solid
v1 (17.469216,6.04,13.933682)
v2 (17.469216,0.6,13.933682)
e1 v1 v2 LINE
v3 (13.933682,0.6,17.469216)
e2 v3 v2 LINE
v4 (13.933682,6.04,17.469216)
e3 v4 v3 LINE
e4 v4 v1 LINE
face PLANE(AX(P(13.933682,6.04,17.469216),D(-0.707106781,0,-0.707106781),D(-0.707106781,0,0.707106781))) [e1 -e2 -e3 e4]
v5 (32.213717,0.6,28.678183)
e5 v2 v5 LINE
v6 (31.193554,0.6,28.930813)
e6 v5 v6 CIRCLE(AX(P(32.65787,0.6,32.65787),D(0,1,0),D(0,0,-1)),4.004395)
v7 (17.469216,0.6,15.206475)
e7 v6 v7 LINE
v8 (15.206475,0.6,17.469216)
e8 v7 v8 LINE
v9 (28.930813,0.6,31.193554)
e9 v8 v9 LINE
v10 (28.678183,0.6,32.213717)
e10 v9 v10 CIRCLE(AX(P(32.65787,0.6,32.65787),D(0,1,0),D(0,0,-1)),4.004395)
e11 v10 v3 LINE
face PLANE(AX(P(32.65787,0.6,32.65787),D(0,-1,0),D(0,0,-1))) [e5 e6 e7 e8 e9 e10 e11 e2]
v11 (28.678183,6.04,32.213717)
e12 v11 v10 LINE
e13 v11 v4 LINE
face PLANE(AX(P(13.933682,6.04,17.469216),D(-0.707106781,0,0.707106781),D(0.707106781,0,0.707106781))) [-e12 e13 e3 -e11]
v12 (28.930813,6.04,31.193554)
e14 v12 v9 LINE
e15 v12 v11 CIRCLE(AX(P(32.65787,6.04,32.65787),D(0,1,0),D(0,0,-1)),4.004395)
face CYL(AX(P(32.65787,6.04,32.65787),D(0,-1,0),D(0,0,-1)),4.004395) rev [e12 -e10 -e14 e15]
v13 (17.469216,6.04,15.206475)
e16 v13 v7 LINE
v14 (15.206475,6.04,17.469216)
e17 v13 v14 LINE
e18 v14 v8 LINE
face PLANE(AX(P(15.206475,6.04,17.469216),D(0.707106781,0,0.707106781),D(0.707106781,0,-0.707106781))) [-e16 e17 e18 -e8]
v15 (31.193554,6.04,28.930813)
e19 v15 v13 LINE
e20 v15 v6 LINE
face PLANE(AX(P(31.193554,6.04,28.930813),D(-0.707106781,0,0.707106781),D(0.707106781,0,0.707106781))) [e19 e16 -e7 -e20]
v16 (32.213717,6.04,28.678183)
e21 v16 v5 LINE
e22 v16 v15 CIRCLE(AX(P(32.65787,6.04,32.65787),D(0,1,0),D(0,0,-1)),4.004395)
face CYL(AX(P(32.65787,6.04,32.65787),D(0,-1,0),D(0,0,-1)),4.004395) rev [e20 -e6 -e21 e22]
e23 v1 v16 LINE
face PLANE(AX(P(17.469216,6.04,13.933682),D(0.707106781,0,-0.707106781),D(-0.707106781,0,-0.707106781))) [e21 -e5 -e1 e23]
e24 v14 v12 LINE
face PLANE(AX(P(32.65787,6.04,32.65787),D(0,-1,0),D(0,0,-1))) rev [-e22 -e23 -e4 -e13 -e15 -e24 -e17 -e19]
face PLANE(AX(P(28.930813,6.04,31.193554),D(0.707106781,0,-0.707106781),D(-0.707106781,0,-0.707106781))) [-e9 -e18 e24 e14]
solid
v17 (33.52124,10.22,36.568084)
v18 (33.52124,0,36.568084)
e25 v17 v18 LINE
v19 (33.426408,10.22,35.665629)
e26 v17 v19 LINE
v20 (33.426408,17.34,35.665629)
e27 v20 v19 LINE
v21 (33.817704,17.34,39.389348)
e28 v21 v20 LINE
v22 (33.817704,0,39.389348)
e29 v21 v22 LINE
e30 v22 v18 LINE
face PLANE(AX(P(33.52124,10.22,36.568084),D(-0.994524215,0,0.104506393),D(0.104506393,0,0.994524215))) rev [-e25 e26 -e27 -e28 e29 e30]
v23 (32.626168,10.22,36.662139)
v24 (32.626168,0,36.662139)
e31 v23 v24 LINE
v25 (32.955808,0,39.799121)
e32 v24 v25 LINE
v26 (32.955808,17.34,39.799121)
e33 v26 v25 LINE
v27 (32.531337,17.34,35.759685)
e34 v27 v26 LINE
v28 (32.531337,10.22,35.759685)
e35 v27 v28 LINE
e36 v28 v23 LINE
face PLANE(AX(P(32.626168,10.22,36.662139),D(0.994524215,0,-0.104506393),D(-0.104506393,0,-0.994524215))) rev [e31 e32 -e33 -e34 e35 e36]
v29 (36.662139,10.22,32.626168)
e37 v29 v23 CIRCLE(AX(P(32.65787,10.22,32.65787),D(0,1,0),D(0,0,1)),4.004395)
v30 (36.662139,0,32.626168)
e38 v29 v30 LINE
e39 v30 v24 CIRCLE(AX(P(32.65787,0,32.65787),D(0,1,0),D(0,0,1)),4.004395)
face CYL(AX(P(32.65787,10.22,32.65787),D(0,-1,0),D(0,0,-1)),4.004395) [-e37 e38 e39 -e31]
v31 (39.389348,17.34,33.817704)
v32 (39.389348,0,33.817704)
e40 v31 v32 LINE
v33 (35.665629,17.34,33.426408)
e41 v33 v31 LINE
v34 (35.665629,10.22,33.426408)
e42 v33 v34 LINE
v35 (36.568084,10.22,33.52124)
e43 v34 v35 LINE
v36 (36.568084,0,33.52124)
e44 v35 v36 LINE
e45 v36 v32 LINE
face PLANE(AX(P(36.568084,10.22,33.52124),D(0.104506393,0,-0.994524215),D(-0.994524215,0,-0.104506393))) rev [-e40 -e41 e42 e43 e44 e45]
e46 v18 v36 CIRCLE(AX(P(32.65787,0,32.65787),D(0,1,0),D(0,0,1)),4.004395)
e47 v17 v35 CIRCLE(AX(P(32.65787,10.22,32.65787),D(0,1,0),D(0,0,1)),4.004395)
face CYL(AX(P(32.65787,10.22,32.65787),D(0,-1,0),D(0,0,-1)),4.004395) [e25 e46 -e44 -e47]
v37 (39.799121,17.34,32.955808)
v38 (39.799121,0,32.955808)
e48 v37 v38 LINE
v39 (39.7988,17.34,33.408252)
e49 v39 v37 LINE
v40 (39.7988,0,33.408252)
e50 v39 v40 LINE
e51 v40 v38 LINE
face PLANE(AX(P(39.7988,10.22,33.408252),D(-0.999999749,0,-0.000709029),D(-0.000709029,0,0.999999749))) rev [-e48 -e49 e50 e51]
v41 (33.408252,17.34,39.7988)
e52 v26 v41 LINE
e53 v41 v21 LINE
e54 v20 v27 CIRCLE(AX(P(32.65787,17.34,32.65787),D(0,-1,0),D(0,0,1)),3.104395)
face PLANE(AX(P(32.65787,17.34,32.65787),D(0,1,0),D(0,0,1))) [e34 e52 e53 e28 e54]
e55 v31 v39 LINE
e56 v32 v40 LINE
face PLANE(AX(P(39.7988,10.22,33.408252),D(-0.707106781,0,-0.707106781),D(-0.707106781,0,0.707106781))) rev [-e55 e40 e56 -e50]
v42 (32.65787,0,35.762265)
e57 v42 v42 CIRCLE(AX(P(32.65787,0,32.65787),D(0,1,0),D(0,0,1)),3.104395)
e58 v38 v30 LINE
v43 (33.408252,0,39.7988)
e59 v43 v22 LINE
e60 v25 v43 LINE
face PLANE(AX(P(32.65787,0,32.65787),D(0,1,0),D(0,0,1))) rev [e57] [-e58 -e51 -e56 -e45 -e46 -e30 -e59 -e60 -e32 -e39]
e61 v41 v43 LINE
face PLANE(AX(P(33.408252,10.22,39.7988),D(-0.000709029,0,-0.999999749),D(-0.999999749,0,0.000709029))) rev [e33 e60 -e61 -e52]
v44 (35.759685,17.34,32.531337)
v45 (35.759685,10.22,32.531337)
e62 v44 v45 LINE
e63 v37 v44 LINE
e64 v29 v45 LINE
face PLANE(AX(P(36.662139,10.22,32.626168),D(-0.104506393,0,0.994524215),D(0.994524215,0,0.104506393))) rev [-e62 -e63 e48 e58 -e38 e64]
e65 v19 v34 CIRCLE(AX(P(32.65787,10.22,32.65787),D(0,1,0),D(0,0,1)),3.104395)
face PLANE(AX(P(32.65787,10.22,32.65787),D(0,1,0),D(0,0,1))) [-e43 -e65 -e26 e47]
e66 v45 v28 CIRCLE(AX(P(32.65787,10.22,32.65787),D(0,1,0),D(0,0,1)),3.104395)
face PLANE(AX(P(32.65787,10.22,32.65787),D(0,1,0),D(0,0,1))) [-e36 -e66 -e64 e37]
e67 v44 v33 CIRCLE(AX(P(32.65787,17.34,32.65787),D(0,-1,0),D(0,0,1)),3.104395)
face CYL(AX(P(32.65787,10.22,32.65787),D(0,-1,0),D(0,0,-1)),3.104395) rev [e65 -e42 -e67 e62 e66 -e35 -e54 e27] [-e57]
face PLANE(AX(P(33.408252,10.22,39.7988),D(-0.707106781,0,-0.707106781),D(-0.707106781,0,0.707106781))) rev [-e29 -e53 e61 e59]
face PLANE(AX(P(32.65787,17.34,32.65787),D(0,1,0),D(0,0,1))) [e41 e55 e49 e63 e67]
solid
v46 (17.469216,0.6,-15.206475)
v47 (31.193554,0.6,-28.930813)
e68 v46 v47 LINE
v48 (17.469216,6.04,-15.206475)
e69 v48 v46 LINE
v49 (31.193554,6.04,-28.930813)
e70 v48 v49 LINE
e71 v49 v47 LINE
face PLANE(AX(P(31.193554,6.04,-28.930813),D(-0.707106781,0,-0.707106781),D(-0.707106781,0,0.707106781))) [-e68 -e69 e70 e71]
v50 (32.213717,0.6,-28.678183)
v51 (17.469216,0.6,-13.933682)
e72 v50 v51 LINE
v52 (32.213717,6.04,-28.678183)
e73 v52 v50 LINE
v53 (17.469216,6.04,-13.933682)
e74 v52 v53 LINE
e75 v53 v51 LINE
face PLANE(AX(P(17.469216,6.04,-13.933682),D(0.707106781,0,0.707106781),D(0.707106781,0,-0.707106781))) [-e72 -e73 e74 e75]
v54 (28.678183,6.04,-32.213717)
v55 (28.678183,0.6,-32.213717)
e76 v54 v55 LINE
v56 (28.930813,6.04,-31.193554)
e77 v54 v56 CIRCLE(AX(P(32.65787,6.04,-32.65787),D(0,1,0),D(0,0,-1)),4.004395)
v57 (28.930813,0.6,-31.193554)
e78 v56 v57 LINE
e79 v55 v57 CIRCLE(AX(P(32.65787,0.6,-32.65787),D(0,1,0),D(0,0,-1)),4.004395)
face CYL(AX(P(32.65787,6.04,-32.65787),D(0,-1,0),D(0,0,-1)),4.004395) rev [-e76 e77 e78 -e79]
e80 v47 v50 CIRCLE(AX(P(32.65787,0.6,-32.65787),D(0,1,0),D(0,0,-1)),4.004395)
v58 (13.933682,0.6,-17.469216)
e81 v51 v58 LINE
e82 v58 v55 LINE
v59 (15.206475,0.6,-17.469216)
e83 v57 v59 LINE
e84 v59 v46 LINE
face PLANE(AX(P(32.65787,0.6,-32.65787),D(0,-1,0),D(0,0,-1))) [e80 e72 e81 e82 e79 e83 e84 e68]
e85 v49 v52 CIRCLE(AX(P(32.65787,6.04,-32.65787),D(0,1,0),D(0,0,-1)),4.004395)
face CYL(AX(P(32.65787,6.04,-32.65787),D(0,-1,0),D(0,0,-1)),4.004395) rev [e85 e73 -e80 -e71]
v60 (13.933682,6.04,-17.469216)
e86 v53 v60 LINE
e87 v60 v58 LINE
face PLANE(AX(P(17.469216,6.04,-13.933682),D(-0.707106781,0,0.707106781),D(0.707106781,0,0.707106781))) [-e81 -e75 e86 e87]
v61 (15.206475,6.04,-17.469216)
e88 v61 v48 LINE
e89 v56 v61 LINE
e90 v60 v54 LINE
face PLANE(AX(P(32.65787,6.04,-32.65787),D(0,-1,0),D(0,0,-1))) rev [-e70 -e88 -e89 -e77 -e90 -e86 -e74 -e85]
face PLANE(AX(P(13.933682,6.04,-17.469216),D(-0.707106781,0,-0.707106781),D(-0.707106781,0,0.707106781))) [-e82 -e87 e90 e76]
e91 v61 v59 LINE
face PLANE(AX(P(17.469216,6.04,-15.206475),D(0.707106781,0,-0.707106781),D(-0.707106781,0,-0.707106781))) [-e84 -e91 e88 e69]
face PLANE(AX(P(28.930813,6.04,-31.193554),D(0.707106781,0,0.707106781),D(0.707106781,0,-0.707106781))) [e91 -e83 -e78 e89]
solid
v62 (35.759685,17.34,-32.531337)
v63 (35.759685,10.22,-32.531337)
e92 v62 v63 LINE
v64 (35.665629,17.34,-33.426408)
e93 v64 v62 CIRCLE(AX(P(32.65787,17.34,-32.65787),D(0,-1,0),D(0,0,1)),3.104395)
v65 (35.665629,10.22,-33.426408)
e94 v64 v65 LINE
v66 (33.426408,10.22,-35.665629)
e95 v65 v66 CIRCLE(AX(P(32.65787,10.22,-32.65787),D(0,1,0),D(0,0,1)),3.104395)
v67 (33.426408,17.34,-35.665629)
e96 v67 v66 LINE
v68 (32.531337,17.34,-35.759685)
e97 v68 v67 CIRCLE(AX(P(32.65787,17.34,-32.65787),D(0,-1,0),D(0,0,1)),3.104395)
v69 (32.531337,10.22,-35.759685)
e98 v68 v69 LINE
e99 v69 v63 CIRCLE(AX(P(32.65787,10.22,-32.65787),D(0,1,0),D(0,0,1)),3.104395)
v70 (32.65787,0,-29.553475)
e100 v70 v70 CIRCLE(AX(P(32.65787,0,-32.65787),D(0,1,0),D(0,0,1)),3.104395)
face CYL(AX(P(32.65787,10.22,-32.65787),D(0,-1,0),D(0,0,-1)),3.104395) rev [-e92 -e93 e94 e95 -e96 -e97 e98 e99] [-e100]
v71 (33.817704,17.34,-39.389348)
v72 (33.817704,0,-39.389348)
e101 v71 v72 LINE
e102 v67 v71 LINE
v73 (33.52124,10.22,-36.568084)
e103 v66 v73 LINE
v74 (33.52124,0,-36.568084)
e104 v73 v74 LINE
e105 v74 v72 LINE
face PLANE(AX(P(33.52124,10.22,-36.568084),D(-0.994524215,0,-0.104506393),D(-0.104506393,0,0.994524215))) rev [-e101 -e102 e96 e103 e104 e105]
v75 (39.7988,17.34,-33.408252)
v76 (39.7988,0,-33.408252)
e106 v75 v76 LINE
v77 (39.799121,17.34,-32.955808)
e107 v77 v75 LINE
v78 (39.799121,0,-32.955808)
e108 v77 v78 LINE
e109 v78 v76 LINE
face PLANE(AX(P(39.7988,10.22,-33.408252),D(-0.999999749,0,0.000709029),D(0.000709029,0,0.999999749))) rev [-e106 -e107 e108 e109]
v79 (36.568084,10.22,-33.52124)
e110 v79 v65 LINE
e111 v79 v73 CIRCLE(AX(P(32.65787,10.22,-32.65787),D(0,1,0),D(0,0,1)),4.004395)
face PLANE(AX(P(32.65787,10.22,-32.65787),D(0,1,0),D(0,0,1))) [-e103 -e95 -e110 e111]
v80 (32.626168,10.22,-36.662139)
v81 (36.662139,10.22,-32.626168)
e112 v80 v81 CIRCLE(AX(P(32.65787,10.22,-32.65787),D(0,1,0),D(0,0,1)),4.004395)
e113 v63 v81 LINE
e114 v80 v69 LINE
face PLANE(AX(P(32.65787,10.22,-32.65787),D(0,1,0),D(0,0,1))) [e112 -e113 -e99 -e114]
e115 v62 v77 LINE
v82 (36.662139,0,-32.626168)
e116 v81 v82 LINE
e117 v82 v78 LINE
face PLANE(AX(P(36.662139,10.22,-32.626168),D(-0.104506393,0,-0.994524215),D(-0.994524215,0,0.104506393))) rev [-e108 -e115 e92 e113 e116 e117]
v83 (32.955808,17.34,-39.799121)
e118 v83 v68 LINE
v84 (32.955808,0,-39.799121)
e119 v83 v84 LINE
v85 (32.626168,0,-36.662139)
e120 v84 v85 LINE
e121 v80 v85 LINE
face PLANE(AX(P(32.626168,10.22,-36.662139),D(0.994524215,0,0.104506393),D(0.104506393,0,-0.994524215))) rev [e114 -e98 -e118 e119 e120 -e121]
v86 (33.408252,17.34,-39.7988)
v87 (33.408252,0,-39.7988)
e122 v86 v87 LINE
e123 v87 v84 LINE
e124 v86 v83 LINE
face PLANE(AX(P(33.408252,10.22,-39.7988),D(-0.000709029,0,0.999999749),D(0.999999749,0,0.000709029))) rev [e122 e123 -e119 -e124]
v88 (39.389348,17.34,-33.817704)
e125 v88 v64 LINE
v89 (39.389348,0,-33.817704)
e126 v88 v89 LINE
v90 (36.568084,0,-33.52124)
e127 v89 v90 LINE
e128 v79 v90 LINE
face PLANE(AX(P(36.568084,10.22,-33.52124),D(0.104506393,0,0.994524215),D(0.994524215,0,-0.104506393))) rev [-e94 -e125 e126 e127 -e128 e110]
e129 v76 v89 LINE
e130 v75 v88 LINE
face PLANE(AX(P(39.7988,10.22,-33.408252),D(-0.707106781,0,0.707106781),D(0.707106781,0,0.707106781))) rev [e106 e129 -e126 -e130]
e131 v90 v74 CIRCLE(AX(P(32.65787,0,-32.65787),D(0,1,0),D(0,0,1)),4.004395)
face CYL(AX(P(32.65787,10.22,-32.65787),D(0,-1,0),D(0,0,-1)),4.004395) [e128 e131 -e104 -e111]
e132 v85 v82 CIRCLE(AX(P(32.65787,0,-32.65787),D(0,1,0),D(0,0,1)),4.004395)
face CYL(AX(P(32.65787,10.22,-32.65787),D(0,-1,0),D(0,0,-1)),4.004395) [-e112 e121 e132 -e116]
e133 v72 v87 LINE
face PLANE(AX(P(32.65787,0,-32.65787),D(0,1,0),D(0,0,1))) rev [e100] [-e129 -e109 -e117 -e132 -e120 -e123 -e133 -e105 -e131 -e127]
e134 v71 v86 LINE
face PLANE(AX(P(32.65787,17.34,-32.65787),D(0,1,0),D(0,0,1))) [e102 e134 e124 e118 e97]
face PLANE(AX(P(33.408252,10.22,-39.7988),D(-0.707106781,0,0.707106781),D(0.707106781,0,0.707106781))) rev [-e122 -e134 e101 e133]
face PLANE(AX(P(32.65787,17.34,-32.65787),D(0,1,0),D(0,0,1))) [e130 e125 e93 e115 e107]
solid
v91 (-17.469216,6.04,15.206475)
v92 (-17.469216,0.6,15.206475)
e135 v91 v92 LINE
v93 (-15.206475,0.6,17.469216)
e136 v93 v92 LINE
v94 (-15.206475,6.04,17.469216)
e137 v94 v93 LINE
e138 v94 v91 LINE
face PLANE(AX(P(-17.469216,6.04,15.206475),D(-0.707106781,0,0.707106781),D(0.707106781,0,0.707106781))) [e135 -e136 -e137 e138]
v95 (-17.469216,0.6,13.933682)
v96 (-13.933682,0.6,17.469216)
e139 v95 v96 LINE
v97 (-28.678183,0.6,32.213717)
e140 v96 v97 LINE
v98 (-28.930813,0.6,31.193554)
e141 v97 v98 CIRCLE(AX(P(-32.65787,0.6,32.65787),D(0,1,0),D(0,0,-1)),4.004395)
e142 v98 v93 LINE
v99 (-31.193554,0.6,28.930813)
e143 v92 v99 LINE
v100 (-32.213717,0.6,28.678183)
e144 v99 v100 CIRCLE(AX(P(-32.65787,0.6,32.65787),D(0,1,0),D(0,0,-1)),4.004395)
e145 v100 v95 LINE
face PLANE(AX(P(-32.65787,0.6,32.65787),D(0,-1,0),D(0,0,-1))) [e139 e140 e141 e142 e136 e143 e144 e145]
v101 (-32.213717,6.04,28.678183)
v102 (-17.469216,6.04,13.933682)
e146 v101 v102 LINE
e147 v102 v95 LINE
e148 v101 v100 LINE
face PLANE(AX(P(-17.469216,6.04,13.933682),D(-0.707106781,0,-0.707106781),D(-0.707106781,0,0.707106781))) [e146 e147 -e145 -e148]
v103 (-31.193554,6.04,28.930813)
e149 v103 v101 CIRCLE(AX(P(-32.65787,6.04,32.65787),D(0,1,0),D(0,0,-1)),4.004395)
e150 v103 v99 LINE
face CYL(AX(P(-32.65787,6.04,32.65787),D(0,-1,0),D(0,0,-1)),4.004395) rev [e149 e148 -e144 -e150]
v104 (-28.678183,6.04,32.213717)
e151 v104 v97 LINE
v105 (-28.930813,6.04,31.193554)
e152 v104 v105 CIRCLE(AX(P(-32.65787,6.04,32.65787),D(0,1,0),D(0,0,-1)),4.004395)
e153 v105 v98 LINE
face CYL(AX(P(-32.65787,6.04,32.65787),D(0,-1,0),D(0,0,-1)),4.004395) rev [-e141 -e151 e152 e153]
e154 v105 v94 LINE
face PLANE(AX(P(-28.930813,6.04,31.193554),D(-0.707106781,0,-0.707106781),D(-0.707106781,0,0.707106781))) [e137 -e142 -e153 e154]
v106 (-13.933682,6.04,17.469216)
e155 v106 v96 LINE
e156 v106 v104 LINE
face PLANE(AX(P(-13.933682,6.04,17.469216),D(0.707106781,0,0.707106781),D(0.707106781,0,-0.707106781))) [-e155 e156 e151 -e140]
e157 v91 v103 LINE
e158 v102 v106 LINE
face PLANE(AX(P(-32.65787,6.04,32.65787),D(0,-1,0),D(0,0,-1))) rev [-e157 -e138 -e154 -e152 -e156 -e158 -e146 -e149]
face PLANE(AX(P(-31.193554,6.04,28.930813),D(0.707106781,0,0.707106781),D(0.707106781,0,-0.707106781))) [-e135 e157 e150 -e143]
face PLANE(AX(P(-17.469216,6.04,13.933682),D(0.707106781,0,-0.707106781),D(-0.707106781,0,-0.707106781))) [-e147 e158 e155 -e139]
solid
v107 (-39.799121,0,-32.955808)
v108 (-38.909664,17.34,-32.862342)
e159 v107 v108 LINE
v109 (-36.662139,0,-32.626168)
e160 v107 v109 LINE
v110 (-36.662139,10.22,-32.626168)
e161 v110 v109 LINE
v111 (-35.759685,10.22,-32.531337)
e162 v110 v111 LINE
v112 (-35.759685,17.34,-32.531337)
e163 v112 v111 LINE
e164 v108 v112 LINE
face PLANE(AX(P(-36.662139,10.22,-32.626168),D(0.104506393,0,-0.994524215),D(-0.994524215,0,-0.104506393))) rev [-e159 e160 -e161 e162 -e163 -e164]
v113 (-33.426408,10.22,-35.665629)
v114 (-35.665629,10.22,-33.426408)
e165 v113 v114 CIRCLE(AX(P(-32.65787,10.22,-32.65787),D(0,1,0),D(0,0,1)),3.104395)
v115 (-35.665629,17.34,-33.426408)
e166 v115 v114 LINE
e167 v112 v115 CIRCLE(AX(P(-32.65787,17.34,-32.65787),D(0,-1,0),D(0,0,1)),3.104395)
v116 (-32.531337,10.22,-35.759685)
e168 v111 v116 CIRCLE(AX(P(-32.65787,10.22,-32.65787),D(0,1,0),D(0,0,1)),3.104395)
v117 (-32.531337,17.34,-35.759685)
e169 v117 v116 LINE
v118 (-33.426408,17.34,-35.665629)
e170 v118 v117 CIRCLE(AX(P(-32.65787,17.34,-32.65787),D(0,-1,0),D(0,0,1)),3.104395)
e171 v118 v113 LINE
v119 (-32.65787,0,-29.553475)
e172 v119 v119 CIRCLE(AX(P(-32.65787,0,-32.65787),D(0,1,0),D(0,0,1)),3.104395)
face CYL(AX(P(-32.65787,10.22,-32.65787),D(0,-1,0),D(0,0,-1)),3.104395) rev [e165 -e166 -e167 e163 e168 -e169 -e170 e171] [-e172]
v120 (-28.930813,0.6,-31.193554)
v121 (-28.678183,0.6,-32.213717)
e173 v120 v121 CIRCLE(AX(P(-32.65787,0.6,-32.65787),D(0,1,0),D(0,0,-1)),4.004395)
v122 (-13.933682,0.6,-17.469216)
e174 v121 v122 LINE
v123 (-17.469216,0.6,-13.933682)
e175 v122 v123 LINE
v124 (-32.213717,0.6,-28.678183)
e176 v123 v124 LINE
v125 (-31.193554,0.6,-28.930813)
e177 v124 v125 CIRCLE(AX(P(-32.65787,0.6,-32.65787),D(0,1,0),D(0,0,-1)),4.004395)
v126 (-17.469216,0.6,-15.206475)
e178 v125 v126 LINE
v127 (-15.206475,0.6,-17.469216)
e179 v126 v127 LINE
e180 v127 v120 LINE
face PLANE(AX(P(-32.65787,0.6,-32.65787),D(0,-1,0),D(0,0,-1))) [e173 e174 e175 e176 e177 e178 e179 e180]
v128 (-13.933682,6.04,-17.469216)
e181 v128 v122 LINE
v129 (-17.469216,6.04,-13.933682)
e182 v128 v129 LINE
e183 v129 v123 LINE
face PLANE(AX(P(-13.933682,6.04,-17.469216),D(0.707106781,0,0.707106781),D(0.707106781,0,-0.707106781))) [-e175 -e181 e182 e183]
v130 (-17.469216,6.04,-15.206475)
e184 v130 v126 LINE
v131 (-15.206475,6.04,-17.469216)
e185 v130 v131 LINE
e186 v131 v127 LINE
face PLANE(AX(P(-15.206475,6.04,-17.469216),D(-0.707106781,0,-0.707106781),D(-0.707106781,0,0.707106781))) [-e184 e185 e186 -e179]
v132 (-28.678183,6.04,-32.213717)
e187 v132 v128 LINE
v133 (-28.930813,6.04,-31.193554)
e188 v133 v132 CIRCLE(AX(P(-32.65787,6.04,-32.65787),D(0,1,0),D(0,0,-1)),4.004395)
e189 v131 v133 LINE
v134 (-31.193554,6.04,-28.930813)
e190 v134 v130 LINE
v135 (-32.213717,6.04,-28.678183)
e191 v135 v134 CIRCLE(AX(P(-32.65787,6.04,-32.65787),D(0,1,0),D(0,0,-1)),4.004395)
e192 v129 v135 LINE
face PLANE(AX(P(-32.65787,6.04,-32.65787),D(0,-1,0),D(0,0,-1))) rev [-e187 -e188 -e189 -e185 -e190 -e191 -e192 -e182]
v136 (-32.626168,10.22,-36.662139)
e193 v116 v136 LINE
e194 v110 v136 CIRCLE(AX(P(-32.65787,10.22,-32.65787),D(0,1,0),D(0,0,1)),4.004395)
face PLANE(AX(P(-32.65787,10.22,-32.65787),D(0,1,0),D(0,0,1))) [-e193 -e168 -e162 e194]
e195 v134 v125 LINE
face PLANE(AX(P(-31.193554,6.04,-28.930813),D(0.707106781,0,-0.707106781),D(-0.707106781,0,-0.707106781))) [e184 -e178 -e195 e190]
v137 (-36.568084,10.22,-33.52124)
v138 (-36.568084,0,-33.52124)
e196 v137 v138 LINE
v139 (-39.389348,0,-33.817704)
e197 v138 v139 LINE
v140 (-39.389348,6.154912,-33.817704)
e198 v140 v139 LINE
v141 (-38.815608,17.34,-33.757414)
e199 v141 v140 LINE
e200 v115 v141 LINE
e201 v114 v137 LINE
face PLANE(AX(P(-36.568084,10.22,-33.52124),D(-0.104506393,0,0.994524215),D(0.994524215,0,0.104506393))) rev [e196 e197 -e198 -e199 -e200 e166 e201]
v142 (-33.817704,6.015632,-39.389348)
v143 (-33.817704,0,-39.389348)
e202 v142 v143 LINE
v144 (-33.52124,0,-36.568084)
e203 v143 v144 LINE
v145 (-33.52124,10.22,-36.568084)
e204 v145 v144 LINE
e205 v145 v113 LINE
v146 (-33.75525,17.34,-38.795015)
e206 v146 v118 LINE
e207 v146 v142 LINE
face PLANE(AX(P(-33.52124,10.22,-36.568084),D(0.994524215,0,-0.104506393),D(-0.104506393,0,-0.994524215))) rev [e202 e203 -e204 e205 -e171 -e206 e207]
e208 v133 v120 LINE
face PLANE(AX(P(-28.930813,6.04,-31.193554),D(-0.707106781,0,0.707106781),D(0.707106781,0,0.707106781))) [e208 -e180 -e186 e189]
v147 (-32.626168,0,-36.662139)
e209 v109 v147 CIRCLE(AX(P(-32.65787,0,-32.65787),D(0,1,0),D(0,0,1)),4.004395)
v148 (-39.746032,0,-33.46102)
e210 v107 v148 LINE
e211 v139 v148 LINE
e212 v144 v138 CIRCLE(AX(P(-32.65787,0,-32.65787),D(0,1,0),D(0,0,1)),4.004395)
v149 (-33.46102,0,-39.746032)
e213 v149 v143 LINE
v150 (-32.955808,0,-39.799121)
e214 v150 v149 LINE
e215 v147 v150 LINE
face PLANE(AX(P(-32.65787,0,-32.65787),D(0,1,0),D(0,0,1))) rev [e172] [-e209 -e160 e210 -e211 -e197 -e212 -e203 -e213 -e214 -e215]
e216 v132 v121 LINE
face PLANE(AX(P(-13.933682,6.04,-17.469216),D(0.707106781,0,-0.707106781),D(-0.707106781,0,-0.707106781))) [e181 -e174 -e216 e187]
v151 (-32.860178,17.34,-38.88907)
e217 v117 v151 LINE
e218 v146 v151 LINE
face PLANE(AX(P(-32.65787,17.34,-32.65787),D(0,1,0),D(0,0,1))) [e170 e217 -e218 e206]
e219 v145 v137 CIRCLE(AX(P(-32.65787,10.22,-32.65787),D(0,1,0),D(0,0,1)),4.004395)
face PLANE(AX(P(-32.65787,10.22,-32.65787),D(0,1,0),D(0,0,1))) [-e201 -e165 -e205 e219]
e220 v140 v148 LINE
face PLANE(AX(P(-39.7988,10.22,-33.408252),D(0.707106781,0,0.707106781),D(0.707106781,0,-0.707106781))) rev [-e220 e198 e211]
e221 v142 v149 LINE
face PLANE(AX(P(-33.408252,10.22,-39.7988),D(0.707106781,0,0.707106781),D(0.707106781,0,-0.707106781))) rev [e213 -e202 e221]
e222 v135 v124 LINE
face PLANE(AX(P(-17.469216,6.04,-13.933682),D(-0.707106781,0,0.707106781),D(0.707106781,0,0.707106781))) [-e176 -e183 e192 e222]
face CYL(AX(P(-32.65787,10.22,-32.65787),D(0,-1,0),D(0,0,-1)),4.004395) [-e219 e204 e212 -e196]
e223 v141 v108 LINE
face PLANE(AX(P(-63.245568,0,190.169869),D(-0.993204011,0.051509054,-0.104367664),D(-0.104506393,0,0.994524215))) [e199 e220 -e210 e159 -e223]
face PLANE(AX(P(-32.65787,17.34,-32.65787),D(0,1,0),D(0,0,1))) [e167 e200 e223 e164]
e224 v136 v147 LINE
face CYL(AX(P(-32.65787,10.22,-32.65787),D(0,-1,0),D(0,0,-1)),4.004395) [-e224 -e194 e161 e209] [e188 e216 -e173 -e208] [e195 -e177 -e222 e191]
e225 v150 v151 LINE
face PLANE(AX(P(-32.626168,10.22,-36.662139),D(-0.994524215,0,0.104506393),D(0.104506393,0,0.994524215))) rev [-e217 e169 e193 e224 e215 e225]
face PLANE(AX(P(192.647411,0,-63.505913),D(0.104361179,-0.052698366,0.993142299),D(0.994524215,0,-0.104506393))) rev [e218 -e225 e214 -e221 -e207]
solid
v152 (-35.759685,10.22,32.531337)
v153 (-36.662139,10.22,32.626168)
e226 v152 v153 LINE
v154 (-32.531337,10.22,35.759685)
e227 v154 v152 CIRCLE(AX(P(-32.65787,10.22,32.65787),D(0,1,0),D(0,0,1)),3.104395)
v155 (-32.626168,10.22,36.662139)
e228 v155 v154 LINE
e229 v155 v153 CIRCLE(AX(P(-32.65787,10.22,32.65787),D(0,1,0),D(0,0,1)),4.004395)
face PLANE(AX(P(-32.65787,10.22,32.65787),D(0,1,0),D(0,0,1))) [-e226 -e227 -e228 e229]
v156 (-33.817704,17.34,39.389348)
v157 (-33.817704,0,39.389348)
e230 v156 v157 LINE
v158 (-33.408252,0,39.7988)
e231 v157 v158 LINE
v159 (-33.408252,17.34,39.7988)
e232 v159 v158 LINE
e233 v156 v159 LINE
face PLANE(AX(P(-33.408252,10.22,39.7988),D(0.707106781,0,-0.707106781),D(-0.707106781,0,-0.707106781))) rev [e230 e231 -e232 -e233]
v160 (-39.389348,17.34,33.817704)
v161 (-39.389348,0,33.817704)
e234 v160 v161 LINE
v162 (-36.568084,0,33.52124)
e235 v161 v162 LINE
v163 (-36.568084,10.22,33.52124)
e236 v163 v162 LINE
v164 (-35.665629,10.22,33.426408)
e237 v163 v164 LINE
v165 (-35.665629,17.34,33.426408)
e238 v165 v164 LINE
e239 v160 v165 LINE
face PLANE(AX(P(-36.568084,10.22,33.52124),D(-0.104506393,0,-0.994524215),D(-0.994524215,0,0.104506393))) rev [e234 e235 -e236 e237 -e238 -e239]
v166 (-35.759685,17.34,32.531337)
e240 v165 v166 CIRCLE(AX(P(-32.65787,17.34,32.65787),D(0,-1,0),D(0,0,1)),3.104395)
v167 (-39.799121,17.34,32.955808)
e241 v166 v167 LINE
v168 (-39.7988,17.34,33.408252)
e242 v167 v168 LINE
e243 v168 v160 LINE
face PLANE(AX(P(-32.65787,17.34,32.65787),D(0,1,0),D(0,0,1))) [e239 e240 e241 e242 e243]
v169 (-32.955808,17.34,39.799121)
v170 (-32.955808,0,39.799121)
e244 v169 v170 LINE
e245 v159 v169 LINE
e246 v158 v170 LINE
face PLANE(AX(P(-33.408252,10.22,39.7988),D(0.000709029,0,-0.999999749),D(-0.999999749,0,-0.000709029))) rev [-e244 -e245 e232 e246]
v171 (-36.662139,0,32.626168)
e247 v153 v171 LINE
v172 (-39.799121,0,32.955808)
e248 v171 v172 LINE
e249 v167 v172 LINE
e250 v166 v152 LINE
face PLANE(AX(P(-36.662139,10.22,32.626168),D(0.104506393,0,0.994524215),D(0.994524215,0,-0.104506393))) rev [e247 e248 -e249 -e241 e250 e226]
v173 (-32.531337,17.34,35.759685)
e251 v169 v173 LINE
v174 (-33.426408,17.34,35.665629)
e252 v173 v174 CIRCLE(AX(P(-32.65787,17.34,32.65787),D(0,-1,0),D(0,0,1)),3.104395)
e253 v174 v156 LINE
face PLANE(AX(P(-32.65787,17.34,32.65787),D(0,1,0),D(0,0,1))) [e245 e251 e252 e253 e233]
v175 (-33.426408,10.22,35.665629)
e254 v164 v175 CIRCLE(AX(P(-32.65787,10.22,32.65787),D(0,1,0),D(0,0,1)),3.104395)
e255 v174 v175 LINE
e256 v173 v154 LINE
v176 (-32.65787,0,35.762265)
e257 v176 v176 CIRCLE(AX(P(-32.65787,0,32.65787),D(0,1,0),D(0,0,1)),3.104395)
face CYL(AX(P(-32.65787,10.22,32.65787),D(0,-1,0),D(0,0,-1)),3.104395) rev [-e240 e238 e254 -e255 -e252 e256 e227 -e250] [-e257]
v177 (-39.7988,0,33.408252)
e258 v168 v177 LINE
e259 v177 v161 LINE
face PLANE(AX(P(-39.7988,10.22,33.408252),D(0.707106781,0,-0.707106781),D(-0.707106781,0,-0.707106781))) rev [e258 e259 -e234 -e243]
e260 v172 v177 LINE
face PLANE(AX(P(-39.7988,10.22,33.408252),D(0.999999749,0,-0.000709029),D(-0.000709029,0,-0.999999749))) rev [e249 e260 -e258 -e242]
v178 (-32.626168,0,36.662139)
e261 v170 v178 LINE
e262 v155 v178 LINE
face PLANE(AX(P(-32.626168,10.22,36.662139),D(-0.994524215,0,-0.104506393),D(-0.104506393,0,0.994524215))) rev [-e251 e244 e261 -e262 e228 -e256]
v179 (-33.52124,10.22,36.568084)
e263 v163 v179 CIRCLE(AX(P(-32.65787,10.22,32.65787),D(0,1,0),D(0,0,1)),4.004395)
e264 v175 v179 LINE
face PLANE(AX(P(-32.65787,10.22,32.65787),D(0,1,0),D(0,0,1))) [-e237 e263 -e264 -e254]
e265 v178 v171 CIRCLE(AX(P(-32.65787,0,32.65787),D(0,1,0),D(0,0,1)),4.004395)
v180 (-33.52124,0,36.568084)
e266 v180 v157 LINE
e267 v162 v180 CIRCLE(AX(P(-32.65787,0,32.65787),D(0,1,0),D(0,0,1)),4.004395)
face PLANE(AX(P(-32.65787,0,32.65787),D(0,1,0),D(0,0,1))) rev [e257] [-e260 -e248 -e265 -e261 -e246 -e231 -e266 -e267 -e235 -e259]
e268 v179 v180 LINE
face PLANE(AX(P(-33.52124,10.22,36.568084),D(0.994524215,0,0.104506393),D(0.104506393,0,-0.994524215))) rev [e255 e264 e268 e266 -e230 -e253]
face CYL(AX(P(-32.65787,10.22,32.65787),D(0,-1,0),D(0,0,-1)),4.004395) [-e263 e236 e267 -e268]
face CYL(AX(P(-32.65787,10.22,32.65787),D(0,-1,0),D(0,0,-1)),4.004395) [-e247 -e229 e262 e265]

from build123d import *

# Parameters (mm, degrees)
SKETCH2_R               = 3.104394748
BOSS_EXTRUDE1_DEPTH     = 10.22
BOSS_EXTRUDE1_2_DEPTH   = 10.22
BOSS_EXTRUDE1_3_DEPTH   = 10.22
BOSS_EXTRUDE1_4_DEPTH   = 10.22
BOSS_EXTRUDE2_DEPTH     = 7.12
BOSS_EXTRUDE3_START     = -5.44
BOSS_EXTRUDE3_DEPTH     = 5.44
BOSS_EXTRUDE3_2_DEPTH   = 5.44
BOSS_EXTRUDE3_3_DEPTH   = 5.44
BOSS_EXTRUDE3_4_DEPTH   = 5.44
CUT_EXTRUDE2_DEPTH      = 83.406657099
CUT_EXTRUDE2_DEPTH_BACK = 83.406657099
CUT_EXTRUDE3_DEPTH      = 83.406657099
CUT_EXTRUDE3_DEPTH_BACK = 83.406657099


# Read off the part's stored shape, not the designer's step: Boss-Extrude3
with BuildPart() as part:
    # Sketch2 → Boss-Extrude1 (new body)
    with BuildSketch(Plane(origin=(0, 0, 0), x_dir=(1, 0, 0), z_dir=(0, 1, 0))):
        with BuildLine():
            Line((-36.56808357, 33.521240003), (-39.389348261, 33.81770357))
            Line((-39.389348261, 33.81770357), (-39.798800006, 33.408251825))
            Line((-39.798800006, 33.408251825), (-39.799120802, 32.955807865))
            Line((-39.799120802, 32.955807865), (-36.662139324, 32.62616821))
            ThreePointArc((-36.662139324, 32.62616821), (-29.826335384, 29.826335384), (-32.62616821, 36.662139324))
            Line((-32.62616821, 36.662139324), (-32.955807865, 39.799120802))
            Line((-32.955807865, 39.799120802), (-33.408251825, 39.798800006))
            Line((-33.408251825, 39.798800006), (-33.81770357, 39.389348261))
            Line((-33.81770357, 39.389348261), (-33.521240003, 36.56808357))
            ThreePointArc((-33.521240003, 36.56808357), (-35.489404747, 35.489404747), (-36.56808357, 33.521240003))
        make_face()
        with Locations(Location((-32.657870065, 32.657870065, 0), (0, 0, 270))):
            Circle(SKETCH2_R, mode=Mode.SUBTRACT)
    extrude(amount=BOSS_EXTRUDE1_DEPTH)



with BuildPart() as body_2:
    # Sketch2 → Boss-Extrude1 2 (new body)
    with BuildSketch(Plane(origin=(0, 0, 0), x_dir=(1, 0, 0), z_dir=(0, 1, 0))):
        with BuildLine():
            Line((33.521240003, 36.56808357), (33.81770357, 39.389348261))
            Line((33.81770357, 39.389348261), (33.408251825, 39.798800006))
            Line((33.408251825, 39.798800006), (32.955807865, 39.799120802))
            Line((32.955807865, 39.799120802), (32.62616821, 36.662139324))
            ThreePointArc((32.62616821, 36.662139324), (29.826335384, 29.826335384), (36.662139324, 32.62616821))
            Line((36.662139324, 32.62616821), (39.799120802, 32.955807865))
            Line((39.799120802, 32.955807865), (39.798800006, 33.408251825))
            Line((39.798800006, 33.408251825), (39.389348261, 33.81770357))
            Line((39.389348261, 33.81770357), (36.56808357, 33.521240003))
            ThreePointArc((36.56808357, 33.521240003), (35.489404747, 35.489404747), (33.521240003, 36.56808357))
        make_face()
        with Locations(Location((32.657870065, 32.657870065, 0), (0, 0, 270))):
            Circle(SKETCH2_R, mode=Mode.SUBTRACT)
    extrude(amount=BOSS_EXTRUDE1_2_DEPTH)


with BuildPart() as body_3:
    # Sketch2 → Boss-Extrude1 3 (new body)
    with BuildSketch(Plane(origin=(0, 0, 0), x_dir=(1, 0, 0), z_dir=(0, 1, 0))):
        with BuildLine():
            Line((36.56808357, -33.521240003), (39.389348261, -33.81770357))
            Line((39.389348261, -33.81770357), (39.798800006, -33.408251825))
            Line((39.798800006, -33.408251825), (39.799120802, -32.955807865))
            Line((39.799120802, -32.955807865), (36.662139324, -32.62616821))
            ThreePointArc((36.662139324, -32.62616821), (29.826335384, -29.826335384), (32.62616821, -36.662139324))
            Line((32.62616821, -36.662139324), (32.955807865, -39.799120802))
            Line((32.955807865, -39.799120802), (33.408251825, -39.798800006))
            Line((33.408251825, -39.798800006), (33.81770357, -39.389348261))
            Line((33.81770357, -39.389348261), (33.521240003, -36.56808357))
            ThreePointArc((33.521240003, -36.56808357), (35.489404747, -35.489404747), (36.56808357, -33.521240003))
        make_face()
        with Locations(Location((32.657870065, -32.657870065, 0), (0, 0, 270))):
            Circle(SKETCH2_R, mode=Mode.SUBTRACT)
    extrude(amount=BOSS_EXTRUDE1_3_DEPTH)


with BuildPart() as body_4:
    # Sketch2 → Boss-Extrude1 4 (new body)
    with BuildSketch(Plane(origin=(0, 0, 0), x_dir=(1, 0, 0), z_dir=(0, 1, 0))):
        with BuildLine():
            Line((-33.521240003, -36.56808357), (-33.81770357, -39.389348261))
            Line((-33.81770357, -39.389348261), (-33.408251825, -39.798800006))
            Line((-33.408251825, -39.798800006), (-32.955807865, -39.799120802))
            Line((-32.955807865, -39.799120802), (-32.62616821, -36.662139324))
            ThreePointArc((-32.62616821, -36.662139324), (-29.826335384, -29.826335384), (-36.662139324, -32.62616821))
            Line((-36.662139324, -32.62616821), (-39.799120802, -32.955807865))
            Line((-39.799120802, -32.955807865), (-39.798800006, -33.408251825))
            Line((-39.798800006, -33.408251825), (-39.389348261, -33.81770357))
            Line((-39.389348261, -33.81770357), (-36.56808357, -33.521240003))
            ThreePointArc((-36.56808357, -33.521240003), (-35.489404747, -35.489404747), (-33.521240003, -36.56808357))
        make_face()
        with Locations(Location((-32.657870065, -32.657870065, 0), (0, 0, 270))):
            Circle(SKETCH2_R, mode=Mode.SUBTRACT)
    extrude(amount=BOSS_EXTRUDE1_4_DEPTH)


with BuildPart() as part_1:
    add(part.part)

    add(body_2.part)  # Boss-Extrude2 merges body 2

    add(body_3.part)  # Boss-Extrude2 merges body 3

    add(body_4.part)  # Boss-Extrude2 merges body 4
    # Sketch3 → Boss-Extrude2 (add)
    with BuildSketch(Plane(origin=(0, 10.22, 0), x_dir=(1, 0, 0), z_dir=(0, 1, 0))):
        with BuildLine():
            Line((-39.389348261, 33.81770357), (-35.665629274, 33.426408483))
            ThreePointArc((-35.665629274, 33.426408483), (-35.745265815, 32.982299163), (-35.759685027, 32.531336689))
            Line((-35.759685027, 32.531336689), (-39.799120802, 32.955807865))
            Line((-39.799120802, 32.955807865), (-39.798800006, 33.408251825))
            Line((-39.798800006, 33.408251825), (-39.389348261, 33.81770357))
        make_face()
        with BuildLine():
            Line((-32.955807865, 39.799120802), (-32.531336689, 35.759685027))
            ThreePointArc((-32.531336689, 35.759685027), (-32.982299163, 35.745265815), (-33.426408483, 35.665629274))
            Line((-33.426408483, 35.665629274), (-33.81770357, 39.389348261))
            Line((-33.81770357, 39.389348261), (-33.408251825, 39.798800006))
            Line((-33.408251825, 39.798800006), (-32.955807865, 39.799120802))
        make_face()
        with BuildLine():
            Line((33.81770357, 39.389348261), (33.426408483, 35.665629274))
            ThreePointArc((33.426408483, 35.665629274), (32.982299163, 35.745265815), (32.531336689, 35.759685027))
            Line((32.531336689, 35.759685027), (32.955807865, 39.799120802))
            Line((32.955807865, 39.799120802), (33.408251825, 39.798800006))
            Line((33.408251825, 39.798800006), (33.81770357, 39.389348261))
        make_face()
        with BuildLine():
            Line((39.799120802, 32.955807865), (35.759685027, 32.531336689))
            ThreePointArc((35.759685027, 32.531336689), (35.745265815, 32.982299163), (35.665629274, 33.426408483))
            Line((35.665629274, 33.426408483), (39.389348261, 33.81770357))
            Line((39.389348261, 33.81770357), (39.798800006, 33.408251825))
            Line((39.798800006, 33.408251825), (39.799120802, 32.955807865))
        make_face()
        with BuildLine():
            Line((39.389348261, -33.81770357), (35.665629274, -33.426408483))
            ThreePointArc((35.665629274, -33.426408483), (35.745265815, -32.982299163), (35.759685027, -32.531336689))
            Line((35.759685027, -32.531336689), (39.799120802, -32.955807865))
            Line((39.799120802, -32.955807865), (39.798800006, -33.408251825))
            Line((39.798800006, -33.408251825), (39.389348261, -33.81770357))
        make_face()
        with BuildLine():
            Line((32.955807865, -39.799120802), (32.531336689, -35.759685027))
            ThreePointArc((32.531336689, -35.759685027), (32.982299163, -35.745265815), (33.426408483, -35.665629274))
            Line((33.426408483, -35.665629274), (33.81770357, -39.389348261))
            Line((33.81770357, -39.389348261), (33.408251825, -39.798800006))
            Line((33.408251825, -39.798800006), (32.955807865, -39.799120802))
        make_face()
        with BuildLine():
            Line((-33.81770357, -39.389348261), (-33.426408483, -35.665629274))
            ThreePointArc((-33.426408483, -35.665629274), (-32.982299163, -35.745265815), (-32.531336689, -35.759685027))
            Line((-32.531336689, -35.759685027), (-32.955807865, -39.799120802))
            Line((-32.955807865, -39.799120802), (-33.408251825, -39.798800006))
            Line((-33.408251825, -39.798800006), (-33.81770357, -39.389348261))
        make_face()
        with BuildLine():
            Line((-39.799120802, -32.955807865), (-35.759685027, -32.531336689))
            ThreePointArc((-35.759685027, -32.531336689), (-35.745265815, -32.982299163), (-35.665629274, -33.426408483))
            Line((-35.665629274, -33.426408483), (-39.389348261, -33.81770357))
            Line((-39.389348261, -33.81770357), (-39.798800006, -33.408251825))
            Line((-39.798800006, -33.408251825), (-39.799120802, -32.955807865))
        make_face()
    extrude(amount=BOSS_EXTRUDE2_DEPTH)

    # Boss-Extrude3 4 outline → Boss-Extrude3 4 (add)
    with BuildSketch(Plane(origin=(0, 0.60000007, 0), x_dir=(-1, 0, 0), z_dir=(0, -1, 0)).offset(BOSS_EXTRUDE3_START)):
        with BuildLine():
            Line((17.46921643, 15.206474617), (15.206474617, 17.46921643))
            Line((15.206474617, 17.46921643), (28.930812636, 31.193554449))
            ThreePointArc((28.930812636, 31.193554449), (28.770884193, 31.695311947), (28.678183425, 32.213717445))
            Line((28.678183425, 32.213717445), (13.93368241, 17.46921643))
            Line((13.93368241, 17.46921643), (17.46921643, 13.93368241))
            Line((17.46921643, 13.93368241), (32.213717445, 28.678183425))
            ThreePointArc((32.213717445, 28.678183425), (31.695311947, 28.770884193), (31.193554449, 28.930812636))
            Line((31.193554449, 28.930812636), (17.46921643, 15.206474617))
        make_face()
    extrude(amount=BOSS_EXTRUDE3_4_DEPTH)

    # Sketch7 → Cut-Extrude2 (cut, two sides: drawn at the far end of the back side and taken through both)
    with BuildSketch(Plane(origin=(-28.459390838, 0, 2.990563969), x_dir=(-0.10450639299140999, 0, -0.9945242148001853), z_dir=(0.9945242148001854, 0, -0.10450639299140999)).offset(-CUT_EXTRUDE2_DEPTH_BACK)):
        Polygon((52.877921967, -186.703123885), (43.025281973, 0), (42.110220811, 17.34), (32.257580818, 204.043123885), (405.663828588, 223.748403873), (426.284169737, -166.997843898), align=None)
    extrude(amount=CUT_EXTRUDE2_DEPTH + CUT_EXTRUDE2_DEPTH_BACK, mode=Mode.SUBTRACT)

    # Sketch8 → Cut-Extrude3 (cut, two sides: drawn at the far end of the back side and taken through both)
    with BuildSketch(Plane(origin=(2.990563969, 0, -28.459390838), x_dir=(0.9945242148001855, 0, 0.10450639299140776), z_dir=(-0.10450639299140778, 0, 0.9945242148001856)).offset(-CUT_EXTRUDE3_DEPTH_BACK)):
        Polygon((-52.655564798, -186.714725279), (-43.025281973, 0), (-42.130927744, 17.34), (-32.50064492, 204.054725279), (-405.930095478, 223.315290927), (-426.085015356, -167.454159631), align=None)
    extrude(amount=CUT_EXTRUDE3_DEPTH + CUT_EXTRUDE3_DEPTH_BACK, mode=Mode.SUBTRACT)


with BuildPart() as body_2_2:
    # Boss-Extrude3 outline → Boss-Extrude3 (new body)
    with BuildSketch(Plane(origin=(0, 0.60000007, 0), x_dir=(-1, 0, 0), z_dir=(0, -1, 0)).offset(BOSS_EXTRUDE3_START)):
        with BuildLine():
            ThreePointArc((-31.193554449, 28.930812636), (-31.695311946, 28.770884193), (-32.213717445, 28.678183426))
            Line((-32.213717445, 28.678183426), (-17.46921643, 13.93368241))
            Line((-17.46921643, 13.93368241), (-13.93368241, 17.46921643))
            Line((-13.93368241, 17.46921643), (-28.678183426, 32.213717445))
            ThreePointArc((-28.678183426, 32.213717445), (-28.770884193, 31.695311946), (-28.930812636, 31.193554449))
            Line((-28.930812636, 31.193554449), (-15.206474617, 17.46921643))
            Line((-15.206474617, 17.46921643), (-17.46921643, 15.206474617))
            Line((-17.46921643, 15.206474617), (-31.193554449, 28.930812636))
        make_face()
    extrude(amount=BOSS_EXTRUDE3_DEPTH)


with BuildPart() as body_3_2:
    # Boss-Extrude3 2 outline → Boss-Extrude3 2 (new body)
    with BuildSketch(Plane(origin=(0, 0.60000007, 0), x_dir=(-1, 0, 0), z_dir=(0, -1, 0)).offset(BOSS_EXTRUDE3_START)):
        with BuildLine():
            ThreePointArc((-28.930812636, -31.193554449), (-28.770884193, -31.695311946), (-28.678183426, -32.213717445))
            Line((-28.678183426, -32.213717445), (-13.93368241, -17.46921643))
            Line((-13.93368241, -17.46921643), (-17.46921643, -13.93368241))
            Line((-17.46921643, -13.93368241), (-32.213717445, -28.678183426))
            ThreePointArc((-32.213717445, -28.678183426), (-31.695311946, -28.770884193), (-31.193554449, -28.930812636))
            Line((-31.193554449, -28.930812636), (-17.46921643, -15.206474617))
            Line((-17.46921643, -15.206474617), (-15.206474617, -17.46921643))
            Line((-15.206474617, -17.46921643), (-28.930812636, -31.193554449))
        make_face()
    extrude(amount=BOSS_EXTRUDE3_2_DEPTH)


with BuildPart() as body_4_2:
    # Boss-Extrude3 3 outline → Boss-Extrude3 3 (new body)
    with BuildSketch(Plane(origin=(0, 0.60000007, 0), x_dir=(-1, 0, 0), z_dir=(0, -1, 0)).offset(BOSS_EXTRUDE3_START)):
        with BuildLine():
            ThreePointArc((31.193554449, -28.930812636), (31.695311946, -28.770884193), (32.213717445, -28.678183426))
            Line((32.213717445, -28.678183426), (17.46921643, -13.93368241))
            Line((17.46921643, -13.93368241), (13.93368241, -17.46921643))
            Line((13.93368241, -17.46921643), (28.678183426, -32.213717445))
            ThreePointArc((28.678183426, -32.213717445), (28.770884193, -31.695311946), (28.930812636, -31.193554449))
            Line((28.930812636, -31.193554449), (15.206474617, -17.46921643))
            Line((15.206474617, -17.46921643), (17.46921643, -15.206474617))
            Line((17.46921643, -15.206474617), (31.193554449, -28.930812636))
        make_face()
    extrude(amount=BOSS_EXTRUDE3_3_DEPTH)


solid = Compound([part_1.part, body_2_2.part, body_3_2.part, body_4_2.part])
